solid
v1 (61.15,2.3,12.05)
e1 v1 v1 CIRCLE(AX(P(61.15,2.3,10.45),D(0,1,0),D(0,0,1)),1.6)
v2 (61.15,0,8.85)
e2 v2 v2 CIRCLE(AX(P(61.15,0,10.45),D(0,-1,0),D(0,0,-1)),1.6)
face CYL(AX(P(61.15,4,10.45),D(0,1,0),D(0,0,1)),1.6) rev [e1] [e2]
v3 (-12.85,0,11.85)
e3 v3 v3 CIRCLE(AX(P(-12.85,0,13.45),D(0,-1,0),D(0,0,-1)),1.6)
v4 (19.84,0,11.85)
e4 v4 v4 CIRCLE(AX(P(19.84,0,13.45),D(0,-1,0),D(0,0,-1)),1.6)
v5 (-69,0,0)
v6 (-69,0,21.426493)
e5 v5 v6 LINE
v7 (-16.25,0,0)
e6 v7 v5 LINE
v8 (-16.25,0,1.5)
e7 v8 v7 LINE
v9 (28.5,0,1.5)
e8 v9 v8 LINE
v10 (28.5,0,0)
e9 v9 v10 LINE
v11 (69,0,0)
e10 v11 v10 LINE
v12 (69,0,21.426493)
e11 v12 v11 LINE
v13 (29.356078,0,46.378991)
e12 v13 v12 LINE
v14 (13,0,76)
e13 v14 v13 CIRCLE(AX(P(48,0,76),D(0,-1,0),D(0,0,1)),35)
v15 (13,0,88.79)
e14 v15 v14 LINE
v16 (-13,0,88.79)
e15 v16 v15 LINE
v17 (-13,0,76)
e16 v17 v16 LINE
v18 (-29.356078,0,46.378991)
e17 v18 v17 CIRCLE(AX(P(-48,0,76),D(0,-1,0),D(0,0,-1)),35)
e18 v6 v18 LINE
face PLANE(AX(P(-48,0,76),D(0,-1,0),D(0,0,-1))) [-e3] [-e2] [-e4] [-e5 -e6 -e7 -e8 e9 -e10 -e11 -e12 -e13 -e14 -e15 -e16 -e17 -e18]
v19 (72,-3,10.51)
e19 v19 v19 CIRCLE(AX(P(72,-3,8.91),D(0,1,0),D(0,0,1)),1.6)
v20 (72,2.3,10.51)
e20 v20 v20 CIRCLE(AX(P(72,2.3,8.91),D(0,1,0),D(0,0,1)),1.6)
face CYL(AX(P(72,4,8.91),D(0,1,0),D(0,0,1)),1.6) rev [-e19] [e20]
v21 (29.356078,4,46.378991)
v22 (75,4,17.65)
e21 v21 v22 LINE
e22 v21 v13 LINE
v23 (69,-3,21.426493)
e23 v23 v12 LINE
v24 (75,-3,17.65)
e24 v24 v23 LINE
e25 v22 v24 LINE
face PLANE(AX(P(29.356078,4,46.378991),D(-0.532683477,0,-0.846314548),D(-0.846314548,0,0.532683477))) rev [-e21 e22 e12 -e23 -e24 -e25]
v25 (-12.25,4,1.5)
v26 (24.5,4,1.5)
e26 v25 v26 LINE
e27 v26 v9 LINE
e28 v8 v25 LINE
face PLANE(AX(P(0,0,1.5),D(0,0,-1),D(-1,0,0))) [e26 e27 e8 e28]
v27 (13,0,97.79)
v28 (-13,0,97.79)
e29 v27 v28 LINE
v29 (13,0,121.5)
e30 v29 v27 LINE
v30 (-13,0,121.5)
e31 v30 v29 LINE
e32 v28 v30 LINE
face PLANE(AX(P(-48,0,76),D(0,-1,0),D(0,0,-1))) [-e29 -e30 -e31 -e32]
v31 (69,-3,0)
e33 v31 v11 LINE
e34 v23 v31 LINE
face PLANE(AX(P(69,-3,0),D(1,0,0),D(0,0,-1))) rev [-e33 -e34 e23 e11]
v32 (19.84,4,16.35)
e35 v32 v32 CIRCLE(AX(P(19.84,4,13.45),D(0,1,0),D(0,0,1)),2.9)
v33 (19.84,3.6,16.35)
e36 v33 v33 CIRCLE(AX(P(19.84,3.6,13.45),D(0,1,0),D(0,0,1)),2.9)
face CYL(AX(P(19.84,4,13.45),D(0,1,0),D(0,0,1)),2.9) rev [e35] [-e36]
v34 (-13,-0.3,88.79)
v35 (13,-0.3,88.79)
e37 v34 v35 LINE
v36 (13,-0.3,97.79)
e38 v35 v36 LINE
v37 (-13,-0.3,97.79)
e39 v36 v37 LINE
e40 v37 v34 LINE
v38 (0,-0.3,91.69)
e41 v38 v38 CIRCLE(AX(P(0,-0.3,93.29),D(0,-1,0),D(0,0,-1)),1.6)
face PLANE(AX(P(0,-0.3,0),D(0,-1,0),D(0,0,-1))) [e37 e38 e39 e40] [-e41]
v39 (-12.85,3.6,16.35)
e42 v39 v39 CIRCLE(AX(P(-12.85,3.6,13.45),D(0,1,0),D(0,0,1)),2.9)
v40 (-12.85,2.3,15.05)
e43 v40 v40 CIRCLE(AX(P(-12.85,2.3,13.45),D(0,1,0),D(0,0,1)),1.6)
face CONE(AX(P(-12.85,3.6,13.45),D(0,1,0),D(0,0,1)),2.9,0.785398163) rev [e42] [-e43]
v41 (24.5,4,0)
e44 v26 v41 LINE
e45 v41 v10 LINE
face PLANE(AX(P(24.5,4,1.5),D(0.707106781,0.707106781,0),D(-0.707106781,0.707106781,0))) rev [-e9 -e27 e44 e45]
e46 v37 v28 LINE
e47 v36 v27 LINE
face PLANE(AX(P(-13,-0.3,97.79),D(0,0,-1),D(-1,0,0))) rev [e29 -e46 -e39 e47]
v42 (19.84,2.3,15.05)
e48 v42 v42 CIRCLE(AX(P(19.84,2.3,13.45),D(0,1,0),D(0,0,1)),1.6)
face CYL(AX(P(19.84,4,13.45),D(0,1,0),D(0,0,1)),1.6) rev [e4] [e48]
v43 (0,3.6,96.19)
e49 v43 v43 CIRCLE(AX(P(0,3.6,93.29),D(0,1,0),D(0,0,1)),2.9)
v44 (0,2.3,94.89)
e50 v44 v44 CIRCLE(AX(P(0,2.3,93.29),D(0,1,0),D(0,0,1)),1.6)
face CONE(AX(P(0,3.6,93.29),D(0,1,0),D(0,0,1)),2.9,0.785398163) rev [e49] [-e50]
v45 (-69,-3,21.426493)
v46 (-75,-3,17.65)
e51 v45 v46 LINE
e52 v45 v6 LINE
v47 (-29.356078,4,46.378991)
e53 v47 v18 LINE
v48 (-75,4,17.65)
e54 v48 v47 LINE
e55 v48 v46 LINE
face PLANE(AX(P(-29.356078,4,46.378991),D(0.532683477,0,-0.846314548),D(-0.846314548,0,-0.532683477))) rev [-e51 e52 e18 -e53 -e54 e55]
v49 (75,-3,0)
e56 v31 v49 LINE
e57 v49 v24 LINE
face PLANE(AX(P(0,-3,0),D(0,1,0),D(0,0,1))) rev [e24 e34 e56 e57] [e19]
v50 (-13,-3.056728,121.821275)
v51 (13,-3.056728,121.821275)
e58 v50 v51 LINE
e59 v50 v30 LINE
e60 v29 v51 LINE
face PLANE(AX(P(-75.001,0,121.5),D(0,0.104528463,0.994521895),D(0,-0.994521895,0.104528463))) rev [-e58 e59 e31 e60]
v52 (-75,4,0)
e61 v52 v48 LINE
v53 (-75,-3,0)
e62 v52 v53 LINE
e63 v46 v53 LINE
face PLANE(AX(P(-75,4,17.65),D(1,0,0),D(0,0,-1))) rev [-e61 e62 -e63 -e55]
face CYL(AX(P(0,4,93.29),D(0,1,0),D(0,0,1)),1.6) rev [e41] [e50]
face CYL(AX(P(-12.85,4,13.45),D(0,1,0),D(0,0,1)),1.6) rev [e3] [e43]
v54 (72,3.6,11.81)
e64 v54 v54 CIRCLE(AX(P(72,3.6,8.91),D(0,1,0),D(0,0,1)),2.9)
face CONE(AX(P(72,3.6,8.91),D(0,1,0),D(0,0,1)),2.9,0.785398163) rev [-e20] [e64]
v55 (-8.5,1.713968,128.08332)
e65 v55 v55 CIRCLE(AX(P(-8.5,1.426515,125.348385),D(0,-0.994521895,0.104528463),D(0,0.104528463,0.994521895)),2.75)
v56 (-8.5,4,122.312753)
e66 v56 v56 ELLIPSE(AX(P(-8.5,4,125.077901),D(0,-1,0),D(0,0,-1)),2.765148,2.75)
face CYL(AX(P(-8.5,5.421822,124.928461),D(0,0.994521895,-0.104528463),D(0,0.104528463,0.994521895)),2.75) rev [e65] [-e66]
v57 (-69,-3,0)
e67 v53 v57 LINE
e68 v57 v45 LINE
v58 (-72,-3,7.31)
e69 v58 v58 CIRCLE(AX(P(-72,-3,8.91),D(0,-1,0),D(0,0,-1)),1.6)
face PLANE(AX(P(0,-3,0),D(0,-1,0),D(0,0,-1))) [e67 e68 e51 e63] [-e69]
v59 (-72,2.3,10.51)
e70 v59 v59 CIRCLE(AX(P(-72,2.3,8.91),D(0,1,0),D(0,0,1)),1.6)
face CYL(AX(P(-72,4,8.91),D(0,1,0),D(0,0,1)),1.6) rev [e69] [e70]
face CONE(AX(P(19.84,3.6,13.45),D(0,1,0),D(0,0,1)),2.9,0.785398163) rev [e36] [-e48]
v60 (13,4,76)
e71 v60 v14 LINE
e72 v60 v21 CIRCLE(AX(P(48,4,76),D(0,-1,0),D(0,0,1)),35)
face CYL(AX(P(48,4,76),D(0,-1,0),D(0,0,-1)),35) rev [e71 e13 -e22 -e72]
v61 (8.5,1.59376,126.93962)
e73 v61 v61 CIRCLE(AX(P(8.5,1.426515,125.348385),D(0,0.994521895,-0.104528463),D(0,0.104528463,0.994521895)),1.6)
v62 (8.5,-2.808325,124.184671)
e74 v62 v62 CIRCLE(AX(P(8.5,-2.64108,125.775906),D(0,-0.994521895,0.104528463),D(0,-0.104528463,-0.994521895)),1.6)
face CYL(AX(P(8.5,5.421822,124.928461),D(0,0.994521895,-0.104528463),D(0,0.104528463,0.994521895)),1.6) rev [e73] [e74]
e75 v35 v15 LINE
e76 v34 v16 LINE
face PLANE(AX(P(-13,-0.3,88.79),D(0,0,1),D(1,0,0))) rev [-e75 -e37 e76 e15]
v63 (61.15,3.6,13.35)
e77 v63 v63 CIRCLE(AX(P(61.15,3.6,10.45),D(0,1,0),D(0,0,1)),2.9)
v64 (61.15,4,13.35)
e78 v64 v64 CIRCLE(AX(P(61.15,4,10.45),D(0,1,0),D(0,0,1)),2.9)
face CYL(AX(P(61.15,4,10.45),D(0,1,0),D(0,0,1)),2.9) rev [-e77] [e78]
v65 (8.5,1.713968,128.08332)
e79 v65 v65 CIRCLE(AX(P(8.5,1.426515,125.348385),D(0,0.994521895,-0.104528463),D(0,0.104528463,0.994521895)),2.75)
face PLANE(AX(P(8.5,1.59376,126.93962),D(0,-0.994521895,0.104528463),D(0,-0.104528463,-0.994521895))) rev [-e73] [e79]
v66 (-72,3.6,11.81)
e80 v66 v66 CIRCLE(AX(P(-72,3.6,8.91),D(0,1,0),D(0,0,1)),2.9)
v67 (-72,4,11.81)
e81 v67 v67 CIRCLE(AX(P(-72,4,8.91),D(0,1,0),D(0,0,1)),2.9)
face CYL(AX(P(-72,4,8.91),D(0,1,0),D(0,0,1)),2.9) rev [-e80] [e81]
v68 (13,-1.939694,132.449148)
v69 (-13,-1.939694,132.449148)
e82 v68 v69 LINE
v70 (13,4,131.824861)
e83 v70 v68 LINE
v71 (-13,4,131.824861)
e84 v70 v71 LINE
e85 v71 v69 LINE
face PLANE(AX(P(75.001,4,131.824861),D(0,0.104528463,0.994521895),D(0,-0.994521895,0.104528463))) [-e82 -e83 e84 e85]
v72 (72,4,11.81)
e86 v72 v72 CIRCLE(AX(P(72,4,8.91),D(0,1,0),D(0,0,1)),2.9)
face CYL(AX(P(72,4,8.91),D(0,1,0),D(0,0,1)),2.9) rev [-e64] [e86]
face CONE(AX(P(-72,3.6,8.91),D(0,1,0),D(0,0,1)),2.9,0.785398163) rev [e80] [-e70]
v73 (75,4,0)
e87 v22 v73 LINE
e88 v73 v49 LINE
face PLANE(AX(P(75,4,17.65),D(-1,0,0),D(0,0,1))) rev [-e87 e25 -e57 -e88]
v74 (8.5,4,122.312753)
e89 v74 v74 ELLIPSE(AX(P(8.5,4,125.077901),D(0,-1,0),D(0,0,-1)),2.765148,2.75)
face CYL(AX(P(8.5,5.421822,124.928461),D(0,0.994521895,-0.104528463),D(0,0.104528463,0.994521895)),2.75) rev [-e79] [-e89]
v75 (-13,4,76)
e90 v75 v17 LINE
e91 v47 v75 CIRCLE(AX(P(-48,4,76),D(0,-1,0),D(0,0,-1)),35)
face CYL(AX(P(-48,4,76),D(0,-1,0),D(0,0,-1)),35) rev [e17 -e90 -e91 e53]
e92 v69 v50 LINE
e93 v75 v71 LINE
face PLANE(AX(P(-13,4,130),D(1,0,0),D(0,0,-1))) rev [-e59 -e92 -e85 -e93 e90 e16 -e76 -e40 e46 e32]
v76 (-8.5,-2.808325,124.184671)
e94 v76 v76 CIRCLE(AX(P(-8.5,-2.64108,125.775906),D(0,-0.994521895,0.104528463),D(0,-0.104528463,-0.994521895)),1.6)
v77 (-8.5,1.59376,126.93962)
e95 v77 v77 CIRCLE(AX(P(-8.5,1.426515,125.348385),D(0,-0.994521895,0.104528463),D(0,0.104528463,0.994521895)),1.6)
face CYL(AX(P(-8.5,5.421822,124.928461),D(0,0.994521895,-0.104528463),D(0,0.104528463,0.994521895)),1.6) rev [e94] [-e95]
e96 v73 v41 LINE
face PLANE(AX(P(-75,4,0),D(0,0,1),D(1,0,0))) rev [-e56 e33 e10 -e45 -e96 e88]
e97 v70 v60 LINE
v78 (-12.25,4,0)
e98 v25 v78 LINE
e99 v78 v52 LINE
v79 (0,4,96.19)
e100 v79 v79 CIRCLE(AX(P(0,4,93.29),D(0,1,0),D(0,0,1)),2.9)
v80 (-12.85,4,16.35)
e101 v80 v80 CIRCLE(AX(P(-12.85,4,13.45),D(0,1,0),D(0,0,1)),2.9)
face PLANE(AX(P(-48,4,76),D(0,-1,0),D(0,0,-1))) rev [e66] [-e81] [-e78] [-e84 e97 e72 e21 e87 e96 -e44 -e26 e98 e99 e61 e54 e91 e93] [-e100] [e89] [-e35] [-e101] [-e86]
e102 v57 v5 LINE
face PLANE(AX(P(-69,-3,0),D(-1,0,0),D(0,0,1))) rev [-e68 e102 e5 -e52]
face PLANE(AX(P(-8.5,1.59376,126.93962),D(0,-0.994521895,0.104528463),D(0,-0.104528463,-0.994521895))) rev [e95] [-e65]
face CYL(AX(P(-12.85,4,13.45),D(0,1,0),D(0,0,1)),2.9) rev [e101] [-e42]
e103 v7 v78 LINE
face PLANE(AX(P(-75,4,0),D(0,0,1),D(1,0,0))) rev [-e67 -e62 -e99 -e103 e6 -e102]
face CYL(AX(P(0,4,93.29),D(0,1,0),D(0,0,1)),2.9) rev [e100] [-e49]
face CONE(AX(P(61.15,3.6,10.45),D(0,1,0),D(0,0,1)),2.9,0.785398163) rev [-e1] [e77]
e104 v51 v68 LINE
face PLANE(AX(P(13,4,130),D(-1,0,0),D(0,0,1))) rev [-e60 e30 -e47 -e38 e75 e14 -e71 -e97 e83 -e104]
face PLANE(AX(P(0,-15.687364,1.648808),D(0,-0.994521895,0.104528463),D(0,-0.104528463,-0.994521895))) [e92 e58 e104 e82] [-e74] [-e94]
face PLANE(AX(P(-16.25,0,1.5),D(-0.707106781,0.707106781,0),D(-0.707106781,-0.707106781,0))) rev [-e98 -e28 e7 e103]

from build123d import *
from build123d.topology import SkipClean

# Parameters (mm, degrees)
BOSS_EXTRU_1_DEPTH                   = 4
BOSS_EXTRU_6_DEPTH                   = 3
ENL_V_MAT_EXTRU_9_DEPTH              = 1.5
ESQUISSE18_W                         = 26
ESQUISSE18_H                         = 4
BOSS_EXTRU_5_DEPTH                   = 3.5
ESQUISSE24_W                         = 26
ESQUISSE24_H                         = 9
ESQUISSE24_R                         = 1.6
BOSS_EXTRU_7_DEPTH                   = 0.3
ESQUISSE25_W                         = 26
ESQUISSE25_H                         = 12
BOSS_EXTRU_8_DEPTH                   = 3
ENL_V_MAT_EXTRU_13_REACH             = 155.177
ENL_V_MAT_EXTRU_13_DIRECTION_2_REACH = 155.177
ENL_V_MAT_EXTRU_14_REACH             = 155.177
ENL_V_MAT_EXTRU_14_DIRECTION_2_REACH = 155.177
ENL_V_MAT_EXTRU_15_REACH             = 161.061
ESQUISSE38_W                         = 26
ESQUISSE38_H                         = 10.68641461
ESQUISSE38_R                         = 1.6
BOSS_EXTRU_10_DEPTH                  = 0.09


# Read off the part's stored shape, not the designer's step: Fraisage pour vis à tête fraisée à 6 pans creux M31
with BuildPart() as part:
    # Esquisse1 → Boss.-Extru.1 (new body)
    with BuildSketch(Plane(origin=(0, 0, 0), x_dir=(1, 0, 0), z_dir=(0, 1, 0))):
        with BuildLine():
            Line((-13, -130), (-13, -76))
            ThreePointArc((-13, -76), (-17.360668588, -59.081626241), (-29.356078322, -46.378990826))
            Line((-29.356078322, -46.378990826), (-75, -17.65))
            Line((-75, -17.65), (-75, 0))
            Line((-75, 0), (75, 0))
            Line((75, 0), (75, -17.65))
            Line((75, -17.65), (29.356078322, -46.378990826))
            ThreePointArc((29.356078322, -46.378990826), (17.360668588, -59.081626241), (13, -76))
            Line((13, -76), (13, -130))
            Line((13, -130), (-13, -130))
        make_face()
    extrude(amount=BOSS_EXTRU_1_DEPTH)

    # Esquisse21 → Boss.-Extru.6 (add)
    with BuildSketch(Plane(origin=(0, 0, 0), x_dir=(-1, 0, 0), z_dir=(0, -1, 0))):
        Polygon((75, 0), (69, 0), (69, -21.426492874), (75, -17.65), align=None)
        Polygon((-75, 0), (-69, 0), (-69, -21.426492874), (-75, -17.65), align=None)
    extrude(amount=BOSS_EXTRU_6_DEPTH)

    # Fraisage pour vis _ t_te frais_e _ 6 2 → Fraisage pour vis à tête fraisée à 6 pans creux M31 (revolve, cut)
    with BuildSketch(Plane.XY.offset(93.29)):
        Polygon((0, 0), (1.6, 0), (1.6, 2.3), (2.9, 3.6), (2.9, 4), (0, 4), align=None)
    revolve(axis=Axis((0, 0, 93.29), (0, 1, 0)), mode=Mode.SUBTRACT)

    # Fraisage pour vis _ t_te frais_e _ 6 3 o → Fraisage pour vis _ t_te frais_e _ 6 3 (revolve, cut)
    with BuildSketch(Plane(origin=(-72, 0, 8.91), x_dir=(1, 0, 0), z_dir=(0, 0, 1))):
        Polygon((0, -3), (1.6, -3), (1.6, 2.3), (2.9, 3.6), (2.9, 4), (0, 4), align=None)
    revolve(axis=Axis((-72, 0, 8.91), (0, 1, 0)), mode=Mode.SUBTRACT)

    # Fraisage pour vis _ t_te frais_e _ 6 4 o → Fraisage pour vis _ t_te frais_e _ 6 4 (revolve, cut)
    with BuildSketch(Plane(origin=(72, 0, 8.91), x_dir=(1, 0, 0), z_dir=(0, 0, 1))):
        Polygon((0, -3), (1.6, -3), (1.6, 2.3), (2.9, 3.6), (2.9, 4), (0, 4), align=None)
    revolve(axis=Axis((72, 0, 8.91), (0, 1, 0)), mode=Mode.SUBTRACT)

    # Fraisage pour vis _ t_te frais_e _ 6 5 o → Fraisage pour vis _ t_te frais_e _ 6 5 (revolve, cut)
    with BuildSketch(Plane(origin=(19.84, 0, 13.45), x_dir=(1, 0, 0), z_dir=(0, 0, 1))):
        Polygon((0, 0), (1.6, 0), (1.6, 2.3), (2.9, 3.6), (2.9, 4), (0, 4), align=None)
    revolve(axis=Axis((19.84, 0, 13.45), (0, 1, 0)), mode=Mode.SUBTRACT)

    # Fraisage pour vis _ t_te frais_e _ 6 6 o → Fraisage pour vis _ t_te frais_e _ 6 6 (revolve, cut)
    with BuildSketch(Plane(origin=(-12.85, 0, 13.45), x_dir=(1, 0, 0), z_dir=(0, 0, 1))):
        Polygon((0, 0), (1.6, 0), (1.6, 2.3), (2.9, 3.6), (2.9, 4), (0, 4), align=None)
    revolve(axis=Axis((-12.85, 0, 13.45), (0, 1, 0)), mode=Mode.SUBTRACT)

    # Fraisage pour vis _ t_te frais_e _ 6 7 o → Fraisage pour vis _ t_te frais_e _ 6 7 (revolve, cut)
    with BuildSketch(Plane(origin=(61.15, 0, 10.45), x_dir=(1, 0, 0), z_dir=(0, 0, 1))):
        Polygon((0, 0), (1.6, 0), (1.6, 2.3), (2.9, 3.6), (2.9, 4), (0, 4), align=None)
    revolve(axis=Axis((61.15, 0, 10.45), (0, 1, 0)), mode=Mode.SUBTRACT)

    # Esquisse16 → Enlèv. mat.-Extru.9 (cut)
    with BuildSketch(Plane(origin=(0, 0, 0), x_dir=(-1, 0, 0), z_dir=(0, 0, -1))):
        Polygon((16.25, 0), (12.25, 4), (-24.5, 4), (-28.5, 0), align=None)
    extrude(amount=-ENL_V_MAT_EXTRU_9_DEPTH, mode=Mode.SUBTRACT)

    # Esquisse18 → Boss.-Extru.5 (add)
    with BuildSketch(Plane.XY.offset(130)):
        with Locations((0, 2)):
            Rectangle(ESQUISSE18_W, ESQUISSE18_H)
    extrude(amount=BOSS_EXTRU_5_DEPTH)

    # Esquisse24 → Boss.-Extru.7 (add)
    with SkipClean():  # the faces are left unmerged after this step: merging them gives an invalid solid
        with BuildSketch(Plane(origin=(0, 0, 0), x_dir=(-1, 0, 0), z_dir=(0, -1, 0))):
            with Locations((0, -93.29)):
                Rectangle(ESQUISSE24_W, ESQUISSE24_H)
            with Locations(Location((0, -93.29, 0), (0, 0, 270))):
                Circle(ESQUISSE24_R, mode=Mode.SUBTRACT)
        extrude(amount=BOSS_EXTRU_7_DEPTH)

    # Esquisse25 → Boss.-Extru.8 (add)
    with SkipClean():  # the faces are left unmerged after this step: merging them gives an invalid solid
        with BuildSketch(Plane(origin=(0, 0, 0), x_dir=(-1, 0, 0), z_dir=(0, -1, 0))):
            with Locations((0, -127.5)):
                Rectangle(ESQUISSE25_W, ESQUISSE25_H)
        extrude(amount=BOSS_EXTRU_8_DEPTH)

    # Esquisse26 → Enlèv. mat.-Extru.13 (cut, up to next)
    with BuildSketch(Plane(origin=(0, 0, 0), x_dir=(0, 0, -1), z_dir=(1, 0, 0)), mode=Mode.PRIVATE) as enl_v_mat_extru_13_sk1:
        Polygon((-121.5, -3), (-133.5, -1.738749177), (-133.5, -3), align=None)
    enl_v_mat_extru_13_tool1 = extrude(enl_v_mat_extru_13_sk1.sketch, amount=-ENL_V_MAT_EXTRU_13_REACH, mode=Mode.PRIVATE) & part.part
    add(enl_v_mat_extru_13_tool1.solids().sort_by_distance((0, -2.579583, 129.5))[0], mode=Mode.SUBTRACT)

    # Esquisse26 → Enlèv. mat.-Extru.13 direction 2 (cut, up to next)
    with BuildSketch(Plane(origin=(0, 0, 0), x_dir=(0, 0, -1), z_dir=(1, 0, 0)), mode=Mode.PRIVATE) as enl_v_mat_extru_13_direction_2_sk1:
        Polygon((-121.5, -3), (-133.5, -1.738749177), (-133.5, -3), align=None)
    enl_v_mat_extru_13_direction_2_tool1 = extrude(enl_v_mat_extru_13_direction_2_sk1.sketch, amount=ENL_V_MAT_EXTRU_13_DIRECTION_2_REACH, mode=Mode.PRIVATE) & part.part
    add(enl_v_mat_extru_13_direction_2_tool1.solids().sort_by_distance((0, -2.579583, 129.5))[0], mode=Mode.SUBTRACT)

    # Esquisse34 → Enlèv. mat.-Extru.14 (cut, up to next)
    with BuildSketch(Plane(origin=(0, 0, 0), x_dir=(0, 0, -1), z_dir=(1, 0, 0)), mode=Mode.PRIVATE) as enl_v_mat_extru_14_sk1:
        Polygon((-133.5, 4), (-131.824861428, 4), (-132.439740849, -1.850186904), (-133.5, -1.738749177), align=None)
    enl_v_mat_extru_14_tool1 = extrude(enl_v_mat_extru_14_sk1.sketch, amount=-ENL_V_MAT_EXTRU_14_REACH, mode=Mode.PRIVATE) & part.part
    add(enl_v_mat_extru_14_tool1.solids().sort_by_distance((0, 1.317192, 132.802089))[0], mode=Mode.SUBTRACT)

    # Esquisse34 → Enlèv. mat.-Extru.14 direction 2 (cut, up to next)
    with BuildSketch(Plane(origin=(0, 0, 0), x_dir=(0, 0, -1), z_dir=(1, 0, 0)), mode=Mode.PRIVATE) as enl_v_mat_extru_14_direction_2_sk1:
        Polygon((-133.5, 4), (-131.824861428, 4), (-132.439740849, -1.850186904), (-133.5, -1.738749177), align=None)
    enl_v_mat_extru_14_direction_2_tool1 = extrude(enl_v_mat_extru_14_direction_2_sk1.sketch, amount=ENL_V_MAT_EXTRU_14_DIRECTION_2_REACH, mode=Mode.PRIVATE) & part.part
    add(enl_v_mat_extru_14_direction_2_tool1.solids().sort_by_distance((0, 1.317192, 132.802089))[0], mode=Mode.SUBTRACT)

    # Esquisse33 → Enlèvement de matière-Révolution1 (revolve, cut)
    with SkipClean():  # the faces are left unmerged after this step: merging them gives an invalid solid
        with BuildSketch(Plane(origin=(8.5, 0, 0), x_dir=(0, 0, -1), z_dir=(1, 0, 0))):
            Polygon((-124.928461333, 5.421822245), (-125.766498931, -2.551572893), (-127.357733964, -2.384327351), (-126.939620111, 1.59376023), (-128.08332029, 1.713967963), (-127.885090335, 3.6), (-127.663396545, 5.709275519), align=None)
        enl_vement_de_mati_re_r_volution1 = revolve(axis=Axis((8.5, 5.421822245, 124.928461333), (0, -0.9945218953682737, 0.10452846326764909)), mode=Mode.SUBTRACT)

    # Symétrie1: Enlèvement de matière-Révolution1 across plane
    with SkipClean():  # the faces are left unmerged after this step: merging them gives an invalid solid
        add(enl_vement_de_mati_re_r_volution1.mirror(Plane(origin=(0, 0, 0), x_dir=(0, 0, 1), z_dir=(1, 0, 0))), mode=Mode.SUBTRACT)

    # Esquisse37 → Enlèv. mat.-Extru.15 (cut, up to next)
    with BuildSketch(Plane(origin=(13, 0, 0), x_dir=(0, 0, -1), z_dir=(1, 0, 0)), mode=Mode.PRIVATE) as enl_v_mat_extru_15_sk1:
        Polygon((-121.5, 0), (-121.811867536, -2.967221401), (-121.5, -3), align=None)
    enl_v_mat_extru_15_tool1 = extrude(enl_v_mat_extru_15_sk1.sketch, amount=-ENL_V_MAT_EXTRU_15_REACH, mode=Mode.PRIVATE) & part.part
    add(enl_v_mat_extru_15_tool1.solids().sort_by_distance((13, -1.989074, 121.603956))[0], mode=Mode.SUBTRACT)

    # Esquisse38 → Boss.-Extru.10 (add)
    with SkipClean():  # the faces are left unmerged after this step: merging them gives an invalid solid
        with BuildSketch(Plane(origin=(0, -15.597856618, 1.639400792), x_dir=(1, 0, 0), z_dir=(0, -0.9945218953682737, 0.10452846326765036))):
            with Locations((0, 126.177617592)):
                Rectangle(ESQUISSE38_W, ESQUISSE38_H)
            with Locations(Location((-8.5, 124.810824897, 0), (0, 0, 90))):
                Circle(ESQUISSE38_R, mode=Mode.SUBTRACT)
            with Locations(Location((8.5, 124.810824897, 0), (0, 0, 90))):
                Circle(ESQUISSE38_R, mode=Mode.SUBTRACT)
        extrude(amount=BOSS_EXTRU_10_DEPTH)


solid = part.part
